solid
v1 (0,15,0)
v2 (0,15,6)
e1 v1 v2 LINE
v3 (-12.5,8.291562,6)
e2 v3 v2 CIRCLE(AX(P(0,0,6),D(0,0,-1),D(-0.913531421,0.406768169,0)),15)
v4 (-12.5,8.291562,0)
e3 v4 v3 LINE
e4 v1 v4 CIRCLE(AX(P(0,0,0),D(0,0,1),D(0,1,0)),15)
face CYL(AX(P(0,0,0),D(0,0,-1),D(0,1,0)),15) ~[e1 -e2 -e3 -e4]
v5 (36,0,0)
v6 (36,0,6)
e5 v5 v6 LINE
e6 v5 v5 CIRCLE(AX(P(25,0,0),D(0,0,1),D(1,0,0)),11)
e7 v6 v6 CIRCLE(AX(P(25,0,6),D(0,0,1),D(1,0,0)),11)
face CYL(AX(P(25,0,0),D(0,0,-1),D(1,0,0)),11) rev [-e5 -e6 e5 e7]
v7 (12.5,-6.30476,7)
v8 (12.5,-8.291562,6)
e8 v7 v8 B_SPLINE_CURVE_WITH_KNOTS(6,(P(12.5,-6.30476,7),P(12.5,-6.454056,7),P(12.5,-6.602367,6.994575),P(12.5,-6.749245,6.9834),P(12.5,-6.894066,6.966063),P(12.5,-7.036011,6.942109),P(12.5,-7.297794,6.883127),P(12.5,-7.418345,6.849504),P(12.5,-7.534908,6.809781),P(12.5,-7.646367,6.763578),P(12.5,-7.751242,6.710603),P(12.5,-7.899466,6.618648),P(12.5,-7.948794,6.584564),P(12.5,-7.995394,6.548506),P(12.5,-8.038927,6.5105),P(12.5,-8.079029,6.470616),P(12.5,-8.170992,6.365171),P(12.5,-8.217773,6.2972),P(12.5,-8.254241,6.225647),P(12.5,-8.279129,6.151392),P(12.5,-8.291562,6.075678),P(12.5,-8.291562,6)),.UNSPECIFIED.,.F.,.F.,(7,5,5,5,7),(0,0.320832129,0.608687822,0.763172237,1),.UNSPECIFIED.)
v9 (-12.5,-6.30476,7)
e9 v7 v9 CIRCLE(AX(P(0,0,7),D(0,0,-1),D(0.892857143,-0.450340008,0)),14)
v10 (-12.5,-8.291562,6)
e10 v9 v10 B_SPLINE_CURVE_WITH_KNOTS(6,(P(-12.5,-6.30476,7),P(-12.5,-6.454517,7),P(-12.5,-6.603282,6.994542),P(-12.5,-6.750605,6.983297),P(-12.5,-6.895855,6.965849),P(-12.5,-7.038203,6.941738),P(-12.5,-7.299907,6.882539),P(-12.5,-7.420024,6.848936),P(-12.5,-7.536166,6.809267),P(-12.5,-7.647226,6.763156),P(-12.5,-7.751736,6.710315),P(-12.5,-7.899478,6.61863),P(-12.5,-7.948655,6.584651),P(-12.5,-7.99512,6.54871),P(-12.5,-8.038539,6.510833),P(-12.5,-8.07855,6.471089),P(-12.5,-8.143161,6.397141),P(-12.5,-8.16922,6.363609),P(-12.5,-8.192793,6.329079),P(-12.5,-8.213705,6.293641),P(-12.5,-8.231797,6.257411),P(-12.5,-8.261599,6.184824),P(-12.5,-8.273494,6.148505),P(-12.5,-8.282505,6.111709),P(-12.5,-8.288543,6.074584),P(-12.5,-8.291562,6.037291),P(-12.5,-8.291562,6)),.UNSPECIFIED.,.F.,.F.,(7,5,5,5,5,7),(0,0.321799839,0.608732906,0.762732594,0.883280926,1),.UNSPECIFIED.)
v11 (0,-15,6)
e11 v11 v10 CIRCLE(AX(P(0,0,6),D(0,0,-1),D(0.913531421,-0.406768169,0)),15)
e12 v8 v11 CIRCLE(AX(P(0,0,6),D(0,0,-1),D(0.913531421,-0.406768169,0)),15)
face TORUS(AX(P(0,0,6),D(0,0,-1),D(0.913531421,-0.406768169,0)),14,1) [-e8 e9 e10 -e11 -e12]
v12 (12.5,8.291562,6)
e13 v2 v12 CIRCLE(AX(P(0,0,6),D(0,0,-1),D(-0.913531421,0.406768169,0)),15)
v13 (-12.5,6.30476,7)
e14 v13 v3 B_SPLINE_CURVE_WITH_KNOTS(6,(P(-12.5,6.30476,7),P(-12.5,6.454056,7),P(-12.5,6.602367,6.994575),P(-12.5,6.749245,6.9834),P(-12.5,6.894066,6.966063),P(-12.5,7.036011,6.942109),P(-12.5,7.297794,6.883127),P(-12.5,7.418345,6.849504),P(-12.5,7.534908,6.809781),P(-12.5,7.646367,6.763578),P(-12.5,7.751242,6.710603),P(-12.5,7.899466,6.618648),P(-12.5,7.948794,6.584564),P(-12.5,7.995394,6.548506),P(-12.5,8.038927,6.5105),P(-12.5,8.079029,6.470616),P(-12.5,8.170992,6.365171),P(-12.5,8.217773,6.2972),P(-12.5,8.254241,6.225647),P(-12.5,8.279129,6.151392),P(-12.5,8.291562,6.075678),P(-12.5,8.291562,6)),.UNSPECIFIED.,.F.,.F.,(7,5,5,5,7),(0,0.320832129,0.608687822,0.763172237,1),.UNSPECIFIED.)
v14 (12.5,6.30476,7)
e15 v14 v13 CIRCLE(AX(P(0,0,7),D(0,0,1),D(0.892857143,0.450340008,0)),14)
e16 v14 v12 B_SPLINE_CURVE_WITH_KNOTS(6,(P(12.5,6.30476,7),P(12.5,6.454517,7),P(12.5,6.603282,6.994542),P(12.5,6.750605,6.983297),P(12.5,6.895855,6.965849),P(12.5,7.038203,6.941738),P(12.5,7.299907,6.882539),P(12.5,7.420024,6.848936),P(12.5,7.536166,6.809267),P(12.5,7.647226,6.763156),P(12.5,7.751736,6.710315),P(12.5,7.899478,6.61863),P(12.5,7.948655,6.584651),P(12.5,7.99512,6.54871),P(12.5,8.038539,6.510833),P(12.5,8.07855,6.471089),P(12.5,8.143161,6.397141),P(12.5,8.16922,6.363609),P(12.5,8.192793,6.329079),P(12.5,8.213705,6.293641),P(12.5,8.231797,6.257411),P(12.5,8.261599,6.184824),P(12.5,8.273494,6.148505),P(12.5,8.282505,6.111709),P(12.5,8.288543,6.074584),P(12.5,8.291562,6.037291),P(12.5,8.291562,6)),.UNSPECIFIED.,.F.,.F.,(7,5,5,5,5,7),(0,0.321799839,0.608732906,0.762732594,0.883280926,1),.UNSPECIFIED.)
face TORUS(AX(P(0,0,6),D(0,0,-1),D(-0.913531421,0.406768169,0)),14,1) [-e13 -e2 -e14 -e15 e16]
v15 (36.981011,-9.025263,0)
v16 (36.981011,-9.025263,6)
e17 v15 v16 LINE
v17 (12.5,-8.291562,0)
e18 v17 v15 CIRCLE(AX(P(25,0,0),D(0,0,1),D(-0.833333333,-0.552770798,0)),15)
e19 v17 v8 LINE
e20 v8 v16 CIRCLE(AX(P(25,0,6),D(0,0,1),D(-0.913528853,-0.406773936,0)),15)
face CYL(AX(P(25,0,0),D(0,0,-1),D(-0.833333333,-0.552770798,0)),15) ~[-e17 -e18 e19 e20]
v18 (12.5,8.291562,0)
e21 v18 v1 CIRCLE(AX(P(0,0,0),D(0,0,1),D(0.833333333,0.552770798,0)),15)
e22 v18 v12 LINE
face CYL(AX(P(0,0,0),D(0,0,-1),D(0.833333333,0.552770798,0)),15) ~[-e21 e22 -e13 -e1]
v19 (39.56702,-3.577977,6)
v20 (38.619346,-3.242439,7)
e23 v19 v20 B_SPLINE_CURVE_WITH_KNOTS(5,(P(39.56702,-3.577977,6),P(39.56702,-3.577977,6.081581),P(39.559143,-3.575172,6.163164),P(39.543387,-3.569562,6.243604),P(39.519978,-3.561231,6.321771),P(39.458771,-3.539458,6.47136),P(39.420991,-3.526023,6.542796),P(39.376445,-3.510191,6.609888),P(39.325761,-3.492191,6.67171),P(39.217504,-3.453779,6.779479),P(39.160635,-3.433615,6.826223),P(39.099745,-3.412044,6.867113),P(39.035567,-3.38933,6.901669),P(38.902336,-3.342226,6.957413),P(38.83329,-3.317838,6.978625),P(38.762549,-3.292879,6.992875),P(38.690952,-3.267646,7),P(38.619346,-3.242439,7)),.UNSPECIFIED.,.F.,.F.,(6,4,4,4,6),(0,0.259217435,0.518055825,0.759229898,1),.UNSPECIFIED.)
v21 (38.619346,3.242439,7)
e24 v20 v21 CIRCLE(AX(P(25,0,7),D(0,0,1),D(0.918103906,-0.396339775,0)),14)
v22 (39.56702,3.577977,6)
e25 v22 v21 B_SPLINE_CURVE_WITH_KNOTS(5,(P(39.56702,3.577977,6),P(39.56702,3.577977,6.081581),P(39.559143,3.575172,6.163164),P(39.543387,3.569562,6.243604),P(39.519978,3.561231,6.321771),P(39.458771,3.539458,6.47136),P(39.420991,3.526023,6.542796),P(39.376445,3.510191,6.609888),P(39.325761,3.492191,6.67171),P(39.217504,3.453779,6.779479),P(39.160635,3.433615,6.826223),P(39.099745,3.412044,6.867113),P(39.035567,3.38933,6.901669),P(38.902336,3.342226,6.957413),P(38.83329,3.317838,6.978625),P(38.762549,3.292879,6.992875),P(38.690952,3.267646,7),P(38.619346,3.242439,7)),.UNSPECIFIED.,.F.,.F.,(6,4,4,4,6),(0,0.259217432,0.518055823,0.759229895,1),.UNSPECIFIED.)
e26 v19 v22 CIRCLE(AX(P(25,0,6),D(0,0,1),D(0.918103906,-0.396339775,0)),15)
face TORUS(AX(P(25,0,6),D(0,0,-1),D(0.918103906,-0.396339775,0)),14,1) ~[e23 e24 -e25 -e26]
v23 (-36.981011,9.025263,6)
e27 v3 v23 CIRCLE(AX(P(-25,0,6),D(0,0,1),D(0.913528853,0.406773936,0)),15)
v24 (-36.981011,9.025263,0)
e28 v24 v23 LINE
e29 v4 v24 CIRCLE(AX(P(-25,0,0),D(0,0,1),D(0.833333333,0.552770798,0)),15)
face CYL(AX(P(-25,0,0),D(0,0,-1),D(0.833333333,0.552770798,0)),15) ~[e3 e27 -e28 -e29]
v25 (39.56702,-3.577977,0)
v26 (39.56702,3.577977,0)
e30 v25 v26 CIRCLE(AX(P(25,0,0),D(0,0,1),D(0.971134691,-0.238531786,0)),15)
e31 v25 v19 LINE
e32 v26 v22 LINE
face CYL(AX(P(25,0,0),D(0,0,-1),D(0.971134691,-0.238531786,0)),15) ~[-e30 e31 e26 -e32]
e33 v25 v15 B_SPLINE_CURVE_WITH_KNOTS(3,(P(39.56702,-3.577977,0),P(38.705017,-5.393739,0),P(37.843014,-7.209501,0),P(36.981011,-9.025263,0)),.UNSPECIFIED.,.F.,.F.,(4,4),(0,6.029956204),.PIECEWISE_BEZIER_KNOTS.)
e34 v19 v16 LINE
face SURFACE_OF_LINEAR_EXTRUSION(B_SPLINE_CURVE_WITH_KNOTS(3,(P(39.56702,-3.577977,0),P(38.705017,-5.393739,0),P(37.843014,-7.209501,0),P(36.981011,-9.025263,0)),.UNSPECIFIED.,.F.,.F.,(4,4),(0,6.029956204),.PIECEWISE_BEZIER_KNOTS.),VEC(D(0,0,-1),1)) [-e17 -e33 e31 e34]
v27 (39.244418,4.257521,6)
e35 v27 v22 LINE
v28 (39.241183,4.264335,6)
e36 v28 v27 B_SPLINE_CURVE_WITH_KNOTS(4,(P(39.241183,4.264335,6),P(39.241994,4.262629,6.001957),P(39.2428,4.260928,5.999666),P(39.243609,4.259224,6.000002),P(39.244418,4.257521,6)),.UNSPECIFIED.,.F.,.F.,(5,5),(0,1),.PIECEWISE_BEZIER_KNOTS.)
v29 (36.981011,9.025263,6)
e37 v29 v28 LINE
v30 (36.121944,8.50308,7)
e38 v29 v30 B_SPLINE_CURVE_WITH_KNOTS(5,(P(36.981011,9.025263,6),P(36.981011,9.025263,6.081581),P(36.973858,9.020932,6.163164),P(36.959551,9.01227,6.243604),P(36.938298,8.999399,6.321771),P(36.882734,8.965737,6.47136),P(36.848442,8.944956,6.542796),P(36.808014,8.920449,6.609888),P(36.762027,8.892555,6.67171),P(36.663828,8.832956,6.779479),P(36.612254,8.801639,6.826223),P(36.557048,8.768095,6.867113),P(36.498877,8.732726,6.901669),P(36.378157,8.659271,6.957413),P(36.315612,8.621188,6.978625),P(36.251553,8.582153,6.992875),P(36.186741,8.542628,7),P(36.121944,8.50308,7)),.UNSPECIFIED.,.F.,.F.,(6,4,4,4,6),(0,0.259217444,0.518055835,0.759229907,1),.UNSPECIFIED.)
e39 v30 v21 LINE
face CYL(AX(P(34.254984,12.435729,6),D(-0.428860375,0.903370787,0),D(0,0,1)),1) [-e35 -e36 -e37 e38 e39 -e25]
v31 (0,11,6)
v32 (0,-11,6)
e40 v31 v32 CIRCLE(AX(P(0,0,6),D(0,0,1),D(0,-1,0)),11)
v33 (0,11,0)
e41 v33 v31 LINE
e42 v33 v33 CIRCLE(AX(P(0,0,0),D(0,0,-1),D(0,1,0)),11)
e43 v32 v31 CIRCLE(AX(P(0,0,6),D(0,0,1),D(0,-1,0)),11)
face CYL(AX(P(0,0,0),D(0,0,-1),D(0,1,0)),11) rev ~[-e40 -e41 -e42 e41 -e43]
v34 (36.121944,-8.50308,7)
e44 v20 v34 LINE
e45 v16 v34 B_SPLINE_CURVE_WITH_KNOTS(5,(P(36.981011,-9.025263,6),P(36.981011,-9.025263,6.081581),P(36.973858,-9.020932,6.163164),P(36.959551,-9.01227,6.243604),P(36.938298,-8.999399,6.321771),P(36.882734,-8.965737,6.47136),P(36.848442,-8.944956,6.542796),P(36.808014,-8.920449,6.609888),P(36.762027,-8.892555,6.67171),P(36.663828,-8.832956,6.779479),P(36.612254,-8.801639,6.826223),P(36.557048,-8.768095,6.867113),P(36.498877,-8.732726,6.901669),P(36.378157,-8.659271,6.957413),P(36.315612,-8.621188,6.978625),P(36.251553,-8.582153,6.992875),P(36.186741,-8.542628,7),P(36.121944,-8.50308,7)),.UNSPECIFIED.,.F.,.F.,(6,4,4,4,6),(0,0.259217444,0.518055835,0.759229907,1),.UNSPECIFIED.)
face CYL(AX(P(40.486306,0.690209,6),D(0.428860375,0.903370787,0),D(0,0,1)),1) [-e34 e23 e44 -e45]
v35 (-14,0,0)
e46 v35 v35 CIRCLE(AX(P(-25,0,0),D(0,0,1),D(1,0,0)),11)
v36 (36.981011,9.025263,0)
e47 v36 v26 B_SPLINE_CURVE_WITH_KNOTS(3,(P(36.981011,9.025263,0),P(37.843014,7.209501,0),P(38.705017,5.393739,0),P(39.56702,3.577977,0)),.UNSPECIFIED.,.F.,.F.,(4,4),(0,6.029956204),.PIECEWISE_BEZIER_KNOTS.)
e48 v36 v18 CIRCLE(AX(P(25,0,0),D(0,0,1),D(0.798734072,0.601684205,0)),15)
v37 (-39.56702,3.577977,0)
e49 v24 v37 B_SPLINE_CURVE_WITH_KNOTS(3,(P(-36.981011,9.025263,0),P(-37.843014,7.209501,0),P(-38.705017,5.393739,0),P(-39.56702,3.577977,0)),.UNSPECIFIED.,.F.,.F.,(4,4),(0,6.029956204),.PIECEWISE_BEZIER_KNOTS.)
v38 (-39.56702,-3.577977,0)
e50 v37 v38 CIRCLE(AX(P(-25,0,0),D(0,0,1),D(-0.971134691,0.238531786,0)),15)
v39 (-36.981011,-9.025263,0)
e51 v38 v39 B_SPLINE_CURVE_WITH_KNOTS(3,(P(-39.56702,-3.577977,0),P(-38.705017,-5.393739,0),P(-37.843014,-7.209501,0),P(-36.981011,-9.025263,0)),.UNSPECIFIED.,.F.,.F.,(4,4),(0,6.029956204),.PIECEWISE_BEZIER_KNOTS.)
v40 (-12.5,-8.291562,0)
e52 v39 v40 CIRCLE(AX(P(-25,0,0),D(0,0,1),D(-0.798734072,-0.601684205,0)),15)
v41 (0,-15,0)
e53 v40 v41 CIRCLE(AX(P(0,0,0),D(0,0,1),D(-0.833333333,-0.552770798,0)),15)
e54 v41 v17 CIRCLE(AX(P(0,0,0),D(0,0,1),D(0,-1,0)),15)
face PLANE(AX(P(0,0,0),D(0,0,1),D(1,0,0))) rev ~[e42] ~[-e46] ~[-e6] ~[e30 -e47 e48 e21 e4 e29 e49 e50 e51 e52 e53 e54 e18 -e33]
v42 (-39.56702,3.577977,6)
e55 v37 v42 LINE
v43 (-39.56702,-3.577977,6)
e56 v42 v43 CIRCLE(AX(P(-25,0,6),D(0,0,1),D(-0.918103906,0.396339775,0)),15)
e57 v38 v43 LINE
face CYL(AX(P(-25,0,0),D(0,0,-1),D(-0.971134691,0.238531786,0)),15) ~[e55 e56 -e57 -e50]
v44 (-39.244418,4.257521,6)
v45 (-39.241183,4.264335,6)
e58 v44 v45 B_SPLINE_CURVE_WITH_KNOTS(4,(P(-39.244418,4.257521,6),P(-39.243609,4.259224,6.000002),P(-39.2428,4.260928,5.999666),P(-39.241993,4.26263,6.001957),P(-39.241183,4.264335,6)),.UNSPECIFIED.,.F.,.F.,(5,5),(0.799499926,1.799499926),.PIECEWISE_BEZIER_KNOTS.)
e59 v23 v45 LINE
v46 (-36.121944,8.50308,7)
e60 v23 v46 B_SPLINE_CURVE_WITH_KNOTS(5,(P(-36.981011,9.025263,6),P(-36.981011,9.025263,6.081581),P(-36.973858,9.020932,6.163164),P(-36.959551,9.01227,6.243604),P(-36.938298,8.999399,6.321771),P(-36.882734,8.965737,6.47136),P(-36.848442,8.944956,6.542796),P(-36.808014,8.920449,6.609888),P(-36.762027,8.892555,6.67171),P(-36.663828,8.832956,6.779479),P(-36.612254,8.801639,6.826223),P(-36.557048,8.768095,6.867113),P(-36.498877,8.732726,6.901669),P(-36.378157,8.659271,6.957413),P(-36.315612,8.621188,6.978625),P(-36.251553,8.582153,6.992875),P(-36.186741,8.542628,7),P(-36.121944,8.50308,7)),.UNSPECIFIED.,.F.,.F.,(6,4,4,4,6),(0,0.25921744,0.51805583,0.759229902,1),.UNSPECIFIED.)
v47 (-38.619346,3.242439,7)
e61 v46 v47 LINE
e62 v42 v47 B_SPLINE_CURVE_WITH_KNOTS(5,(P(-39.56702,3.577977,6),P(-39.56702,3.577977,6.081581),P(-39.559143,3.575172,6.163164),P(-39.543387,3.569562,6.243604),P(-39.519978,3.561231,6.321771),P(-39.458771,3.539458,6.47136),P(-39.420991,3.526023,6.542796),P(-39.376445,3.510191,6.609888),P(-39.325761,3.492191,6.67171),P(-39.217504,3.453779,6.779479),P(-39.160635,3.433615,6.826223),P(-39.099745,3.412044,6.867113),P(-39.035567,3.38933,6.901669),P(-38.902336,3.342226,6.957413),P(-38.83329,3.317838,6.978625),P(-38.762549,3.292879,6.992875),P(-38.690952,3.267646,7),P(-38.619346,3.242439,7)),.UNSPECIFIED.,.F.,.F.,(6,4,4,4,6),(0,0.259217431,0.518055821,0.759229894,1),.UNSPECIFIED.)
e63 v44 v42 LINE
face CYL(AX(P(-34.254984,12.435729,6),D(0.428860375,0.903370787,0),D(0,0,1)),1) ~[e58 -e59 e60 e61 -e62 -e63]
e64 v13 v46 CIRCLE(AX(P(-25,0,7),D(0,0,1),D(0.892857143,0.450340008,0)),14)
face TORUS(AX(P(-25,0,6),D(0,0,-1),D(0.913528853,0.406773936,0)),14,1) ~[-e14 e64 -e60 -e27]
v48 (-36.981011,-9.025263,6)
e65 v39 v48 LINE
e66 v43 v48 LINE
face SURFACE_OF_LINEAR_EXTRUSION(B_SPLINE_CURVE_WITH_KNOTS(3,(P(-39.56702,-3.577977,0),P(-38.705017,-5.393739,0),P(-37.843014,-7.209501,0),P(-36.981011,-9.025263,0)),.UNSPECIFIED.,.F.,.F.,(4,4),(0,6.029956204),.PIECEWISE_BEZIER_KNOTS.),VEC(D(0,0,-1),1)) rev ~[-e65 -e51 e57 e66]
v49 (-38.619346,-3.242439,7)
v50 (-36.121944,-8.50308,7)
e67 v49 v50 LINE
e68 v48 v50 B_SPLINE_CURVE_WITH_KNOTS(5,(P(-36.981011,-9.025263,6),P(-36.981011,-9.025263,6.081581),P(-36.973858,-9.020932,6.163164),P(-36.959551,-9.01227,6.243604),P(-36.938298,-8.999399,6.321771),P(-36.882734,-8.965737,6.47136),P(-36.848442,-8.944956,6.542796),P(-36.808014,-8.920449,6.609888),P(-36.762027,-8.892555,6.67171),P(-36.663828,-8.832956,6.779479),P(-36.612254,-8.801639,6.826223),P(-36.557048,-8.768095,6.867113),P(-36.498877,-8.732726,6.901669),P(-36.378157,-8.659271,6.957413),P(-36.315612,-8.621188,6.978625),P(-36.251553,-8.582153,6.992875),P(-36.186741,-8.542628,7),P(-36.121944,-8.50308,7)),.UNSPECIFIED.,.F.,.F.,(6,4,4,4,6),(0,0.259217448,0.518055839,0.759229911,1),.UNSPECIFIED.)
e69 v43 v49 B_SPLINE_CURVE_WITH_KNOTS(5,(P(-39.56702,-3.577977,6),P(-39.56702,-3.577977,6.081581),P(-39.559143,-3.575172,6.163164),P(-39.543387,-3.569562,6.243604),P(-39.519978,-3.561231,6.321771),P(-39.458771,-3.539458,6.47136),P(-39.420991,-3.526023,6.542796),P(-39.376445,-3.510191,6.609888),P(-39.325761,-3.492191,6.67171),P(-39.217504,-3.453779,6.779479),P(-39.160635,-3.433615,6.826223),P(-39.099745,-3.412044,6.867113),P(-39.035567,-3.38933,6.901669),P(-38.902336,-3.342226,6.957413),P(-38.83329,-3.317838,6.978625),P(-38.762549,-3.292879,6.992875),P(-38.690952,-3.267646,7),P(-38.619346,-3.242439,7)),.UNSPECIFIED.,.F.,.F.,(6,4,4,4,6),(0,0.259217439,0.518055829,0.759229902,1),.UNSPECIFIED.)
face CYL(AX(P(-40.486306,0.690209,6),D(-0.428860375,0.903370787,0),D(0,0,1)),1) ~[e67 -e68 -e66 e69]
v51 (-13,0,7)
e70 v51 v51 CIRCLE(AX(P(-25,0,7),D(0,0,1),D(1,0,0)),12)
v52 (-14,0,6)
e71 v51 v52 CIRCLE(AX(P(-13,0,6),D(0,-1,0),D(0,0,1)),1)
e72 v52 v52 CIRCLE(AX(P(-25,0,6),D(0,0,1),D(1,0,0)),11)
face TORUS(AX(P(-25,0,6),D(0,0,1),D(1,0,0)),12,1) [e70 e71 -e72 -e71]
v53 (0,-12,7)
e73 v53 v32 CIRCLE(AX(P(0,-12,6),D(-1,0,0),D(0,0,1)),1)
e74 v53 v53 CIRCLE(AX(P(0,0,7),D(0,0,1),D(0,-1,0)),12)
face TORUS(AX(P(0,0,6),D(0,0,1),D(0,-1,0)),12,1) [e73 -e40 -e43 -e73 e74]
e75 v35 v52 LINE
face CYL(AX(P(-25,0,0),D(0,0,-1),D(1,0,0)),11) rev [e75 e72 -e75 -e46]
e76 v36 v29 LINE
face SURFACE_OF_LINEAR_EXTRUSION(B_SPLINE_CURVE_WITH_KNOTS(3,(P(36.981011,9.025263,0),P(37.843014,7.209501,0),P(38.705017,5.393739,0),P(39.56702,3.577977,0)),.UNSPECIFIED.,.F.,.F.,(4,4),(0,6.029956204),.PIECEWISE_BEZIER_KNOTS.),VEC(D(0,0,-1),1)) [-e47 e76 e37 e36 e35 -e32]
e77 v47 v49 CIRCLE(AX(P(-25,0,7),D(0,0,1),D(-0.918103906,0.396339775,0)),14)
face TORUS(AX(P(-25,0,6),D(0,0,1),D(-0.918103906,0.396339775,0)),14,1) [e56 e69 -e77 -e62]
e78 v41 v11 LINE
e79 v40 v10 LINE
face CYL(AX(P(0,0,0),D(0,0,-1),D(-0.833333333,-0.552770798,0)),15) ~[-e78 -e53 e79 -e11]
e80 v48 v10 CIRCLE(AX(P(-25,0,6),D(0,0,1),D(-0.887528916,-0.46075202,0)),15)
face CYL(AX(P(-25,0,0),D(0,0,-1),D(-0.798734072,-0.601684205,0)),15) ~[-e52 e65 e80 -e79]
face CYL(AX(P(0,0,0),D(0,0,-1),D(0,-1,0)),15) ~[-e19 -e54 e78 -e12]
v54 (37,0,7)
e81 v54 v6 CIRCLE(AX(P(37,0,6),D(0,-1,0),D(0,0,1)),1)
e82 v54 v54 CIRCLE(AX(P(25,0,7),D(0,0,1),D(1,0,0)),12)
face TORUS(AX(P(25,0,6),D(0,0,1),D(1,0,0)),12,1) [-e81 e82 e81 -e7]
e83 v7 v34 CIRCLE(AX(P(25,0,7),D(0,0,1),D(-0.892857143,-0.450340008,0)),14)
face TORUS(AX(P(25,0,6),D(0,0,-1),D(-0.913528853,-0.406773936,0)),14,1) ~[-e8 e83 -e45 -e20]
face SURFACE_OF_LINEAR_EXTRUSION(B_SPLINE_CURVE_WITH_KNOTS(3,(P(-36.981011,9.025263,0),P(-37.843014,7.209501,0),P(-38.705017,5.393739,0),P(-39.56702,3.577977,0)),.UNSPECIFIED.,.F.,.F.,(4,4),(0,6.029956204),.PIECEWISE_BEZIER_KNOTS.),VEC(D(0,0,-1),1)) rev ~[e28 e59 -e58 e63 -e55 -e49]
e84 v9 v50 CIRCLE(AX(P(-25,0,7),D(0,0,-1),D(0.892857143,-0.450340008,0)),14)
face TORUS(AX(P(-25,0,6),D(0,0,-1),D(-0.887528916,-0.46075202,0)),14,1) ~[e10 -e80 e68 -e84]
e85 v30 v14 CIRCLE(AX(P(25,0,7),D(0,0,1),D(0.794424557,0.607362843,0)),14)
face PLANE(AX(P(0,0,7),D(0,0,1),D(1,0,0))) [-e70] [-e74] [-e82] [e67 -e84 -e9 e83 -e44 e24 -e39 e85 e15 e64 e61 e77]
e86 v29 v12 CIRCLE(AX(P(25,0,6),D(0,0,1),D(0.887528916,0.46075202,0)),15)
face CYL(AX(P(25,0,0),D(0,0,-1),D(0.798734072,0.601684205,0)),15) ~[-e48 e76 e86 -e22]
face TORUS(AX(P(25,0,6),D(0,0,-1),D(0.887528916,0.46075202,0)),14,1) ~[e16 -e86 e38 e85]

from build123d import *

# Parameters (mm, degrees)
F0_R          = 11
F1_DEPTH      = 7
F2_T1_DEPTH   = 14.5299562036
F2_T3_DEPTH   = 14.5299562036
F2_T5_DEPTH   = 14.5299562036
F2_T7_DEPTH   = 14.5299562036
F2_T12_ANGLE  = 46.6991172175
F2_T16_ANGLE  = 128.5620164001
F2_S17_R      = 15
F2_T18_DEPTH  = 17
F2_T22_ANGLE  = 131.9960454578
F2_S23_R      = 15
F2_T24_DEPTH  = 17
F2_S25_R      = 15
F2_T26_DEPTH  = 17
F2_T30_ANGLE  = 128.5620164001
F2_S31_R      = 15
F2_T32_DEPTH  = 17
F2_T34_ANGLE  = 46.6991172175
F2_T38_ANGLE  = 128.5620164001
F2_S39_R      = 15
F2_T40_DEPTH  = 17
F2_T44_ANGLE  = 131.9960454578
F2_S45_R      = 15
F2_T46_DEPTH  = 17
F2_S47_R      = 15
F2_T48_DEPTH  = 17
F2_T52_ANGLE  = 128.5620164001
F2_S53_R      = 15
F2_T54_DEPTH  = 17
F2_T63_ANGLE  = 128.5620164001
F2_S64_R      = 15
F2_T65_DEPTH  = 17
F2_T68_ANGLE  = 131.9960454578
F2_S69_R      = 15
F2_T70_DEPTH  = 17
F2_T76_ANGLE  = 131.9960454578
F2_S77_R      = 15
F2_T78_DEPTH  = 17
F2_T81_ANGLE  = 128.5620164001
F2_S82_R      = 15
F2_T83_DEPTH  = 17
F2_T89_ANGLE  = 128.5620164001
F2_S90_R      = 15
F2_T91_DEPTH  = 17
F2_T94_ANGLE  = 131.9960454578
F2_S95_R      = 15
F2_T96_DEPTH  = 17
F2_T102_ANGLE = 131.9960454578
F2_S103_R     = 15
F2_T104_DEPTH = 17
F2_T107_ANGLE = 128.5620164001
F2_S108_R     = 15
F2_T109_DEPTH = 17


# Not quite as in the source:
# - a fillet or chamfer that OpenCascade refuses, or shapes differently, is made with other operations: its cross-section is extruded or revolved along the edge and cut away or added


with BuildPart() as f1:
    # F0 (on Top) → F1 (new body)
    with BuildSketch(Plane.XY):
        with BuildLine():
            ThreePointArc((-36.9810110821, -9.0252630682), (-24.5506485813, -14.9932679327), (-12.5, -8.2915619759))
            ThreePointArc((-12.5, -8.2915619759), (-7.0931858273, -13.2169101843), (0, -15))
            ThreePointArc((0, -15), (7.0931858273, -13.2169101843), (12.5, -8.2915619759))
            ThreePointArc((12.5, -8.2915619759), (24.5506485813, -14.9932679327), (36.9810110821, -9.0252630682))
            add(Edge.make_bspline(
                [(39.5670203583, -3.577976786), (38.7050172662, -5.39373888), (37.8430141742, -7.2095009741), (36.9810110821, -9.0252630682)],
                knots=[0, 0, 0, 0, 6.0299562036, 6.0299562036, 6.0299562036, 6.0299562036], degree=3))
            ThreePointArc((39.5670203583, -3.577976786), (40, 0), (39.5670203583, 3.577976786))
            add(Edge.make_bspline(
                [(36.9810110821, 9.0252630682), (37.8430141742, 7.2095009741), (38.7050172662, 5.39373888), (39.5670203583, 3.577976786)],
                knots=[0, 0, 0, 0, 6.0299562036, 6.0299562036, 6.0299562036, 6.0299562036], degree=3))
            ThreePointArc((36.9810110821, 9.0252630682), (24.5506485813, 14.9932679327), (12.5, 8.2915619759))
            ThreePointArc((12.5, 8.2915619759), (7.0931858273, 13.2169101843), (0, 15))
            ThreePointArc((0, 15), (-7.0931858273, 13.2169101843), (-12.5, 8.2915619759))
            ThreePointArc((-12.5, 8.2915619759), (-24.5506485813, 14.9932679327), (-36.9810110821, 9.0252630682))
            add(Edge.make_bspline(
                [(-36.9810110821, 9.0252630682), (-37.8430141742, 7.2095009741), (-38.7050172662, 5.39373888), (-39.5670203583, 3.577976786)],
                knots=[0, 0, 0, 0, 6.0299562036, 6.0299562036, 6.0299562036, 6.0299562036], degree=3))
            ThreePointArc((-39.5670203583, 3.577976786), (-40, 0), (-39.5670203583, -3.577976786))
            add(Edge.make_bspline(
                [(-39.5670203583, -3.577976786), (-38.7050172662, -5.39373888), (-37.8430141742, -7.2095009741), (-36.9810110821, -9.0252630682)],
                knots=[0, 0, 0, 0, 6.0299562036, 6.0299562036, 6.0299562036, 6.0299562036], degree=3))
        make_face()
        with Locations((-25, 0)):
            Circle(F0_R, mode=Mode.SUBTRACT)
        with BuildLine():
            ThreePointArc((0, -11), (-11, 0), (0, 11))
            ThreePointArc((0, 11), (11, 0), (0, -11))
        make_face(mode=Mode.SUBTRACT)
        with Locations((25, 0)):
            Circle(F0_R, mode=Mode.SUBTRACT)
    extrude(amount=F1_DEPTH)

    # F2: fillet of radius 1 on 15 edges, made by hand

    # F2_s2 → F2_t1 (cut)
    with BuildSketch(Plane(origin=(-7.7136917523, 16.2484673409, 0), x_dir=(0, 0, 1), z_dir=(0.4288603746, -0.9033707872, 0))):
        with BuildLine():
            ThreePointArc((7, 36.2781427917), (6.7071067812, 36.9852495729), (6, 37.2781427917))
            Line((6, 37.2781427917), (7, 37.2781427917))
            Line((7, 37.2781427917), (7, 36.2781427917))
        make_face()
    extrude(amount=F2_T1_DEPTH, mode=Mode.SUBTRACT)

    # F2_s4 → F2_t3 (cut)
    with BuildSketch(Plane(origin=(7.7136917523, 16.2484673409, 0), x_dir=(0, 0, 1), z_dir=(-0.4288603746, -0.9033707872, 0))):
        with BuildLine():
            ThreePointArc((7, -36.2781427917), (6.7071067812, -36.9852495729), (6, -37.2781427917))
            Line((6, -37.2781427917), (7, -37.2781427917))
            Line((7, -37.2781427917), (7, -36.2781427917))
        make_face()
    extrude(amount=F2_T3_DEPTH, mode=Mode.SUBTRACT)

    # F2_s6 → F2_t5 (cut)
    with BuildSketch(Plane(origin=(1.4823692921, -3.1225293677, 0), x_dir=(0, 0, 1), z_dir=(0.4288603746, -0.9033707872, 0))):
        with BuildLine():
            ThreePointArc((7, -36.2781427917), (6.7071067812, -36.9852495729), (6, -37.2781427917))
            Line((6, -37.2781427917), (7, -37.2781427917))
            Line((7, -37.2781427917), (7, -36.2781427917))
        make_face()
    extrude(amount=F2_T5_DEPTH, mode=Mode.SUBTRACT)

    # F2_s8 → F2_t7 (cut)
    with BuildSketch(Plane(origin=(-1.4823692921, -3.1225293677, 0), x_dir=(0, 0, 1), z_dir=(-0.4288603746, -0.9033707872, 0))):
        with BuildLine():
            ThreePointArc((7, 36.2781427917), (6.7071067812, 36.9852495729), (6, 37.2781427917))
            Line((6, 37.2781427917), (7, 37.2781427917))
            Line((7, 37.2781427917), (7, 36.2781427917))
        make_face()
    extrude(amount=F2_T7_DEPTH, mode=Mode.SUBTRACT)

    # F2_s9 → F2_t10 (revolve, cut)
    with BuildSketch(Plane.XZ):
        with BuildLine():
            ThreePointArc((-13, 7), (-13.7071067812, 6.7071067812), (-14, 6))
            Line((-14, 6), (-14, 7))
            Line((-14, 7), (-13, 7))
        make_face()
    revolve(axis=Axis((-25, 0, 7), (0, 0, 1)), mode=Mode.SUBTRACT)

    # F2_s11 → F2_t12 (revolve, cut)
    with BuildSketch(Plane(origin=(-3.9271304253, -9.0970273856, 0), x_dir=(0, 0, 1), z_dir=(0.3963397747, 0.9181039064, 0))):
        with BuildLine():
            ThreePointArc((6, -37.9525976606), (6.7071067812, -37.6597044417), (7, -36.9525976606))
            Line((7, -36.9525976606), (7, -37.9525976606))
            Line((7, -37.9525976606), (6, -37.9525976606))
        make_face()
    revolve(axis=Axis((-25, 0, 7), (0, 0, 1)), revolution_arc=F2_T12_ANGLE, mode=Mode.SUBTRACT)


with BuildPart() as f2_tool14:
    # F2_s15 → F2_t16 (revolve)
    with BuildSketch(Plane(origin=(-5.3073105904, 10.2232685114, 0), x_dir=(0, 0, 1), z_dir=(-0.4607520197, 0.8875289158, 0))):
        with BuildLine():
            ThreePointArc((7, -36.188222895), (6.7071067812, -36.8953296762), (6, -37.188222895))
            Line((6, -37.188222895), (7, -37.188222895))
            Line((7, -37.188222895), (7, -36.188222895))
        make_face()
    revolve(axis=Axis((-25, 0, 7), (0, 0, 1)), revolution_arc=F2_T16_ANGLE)

    # F2_s17 → F2_t18 (cut, symmetric)
    with BuildSketch(Plane.XY.offset(6.1)):
        Circle(F2_S17_R)
    extrude(amount=F2_T18_DEPTH, both=True, mode=Mode.SUBTRACT)


with BuildPart() as f1_1:
    add(f1.part)

    # F2_t13: cut F2_tool14
    add(f2_tool14.part, mode=Mode.SUBTRACT)


with BuildPart() as f2_tool20:
    # F2_s21 → F2_t22 (revolve)
    with BuildSketch(Plane(origin=(0, 0, 0), x_dir=(0, 0, 1), z_dir=(0.4067681692, 0.9135314207, 0))):
        with BuildLine():
            ThreePointArc((7, 14), (6.7071067812, 14.7071067812), (6, 15))
            Line((6, 15), (7, 15))
            Line((7, 15), (7, 14))
        make_face()
    revolve(axis=Axis((0, 0, 7), (0, 0, -1)), revolution_arc=F2_T22_ANGLE)

    # F2_s23 → F2_t24 (cut, symmetric)
    with BuildSketch(Plane.XY.offset(6.1)):
        with Locations((25, 0)):
            Circle(F2_S23_R)
    extrude(amount=F2_T24_DEPTH, both=True, mode=Mode.SUBTRACT)

    # F2_s25 → F2_t26 (cut, symmetric)
    with BuildSketch(Plane.XY.offset(6.1)):
        with Locations((-25, 0)):
            Circle(F2_S25_R)
    extrude(amount=F2_T26_DEPTH, both=True, mode=Mode.SUBTRACT)


with BuildPart() as f1_2:
    add(f1_1.part)

    # F2_t19: cut F2_tool20
    add(f2_tool20.part, mode=Mode.SUBTRACT)


with BuildPart() as f2_tool28:
    # F2_s29 → F2_t30 (revolve)
    with BuildSketch(Plane(origin=(4.1366258853, -9.2899931871, 0), x_dir=(0, 0, 1), z_dir=(-0.4067739365, 0.9135288526, 0))):
        with BuildLine():
            ThreePointArc((7, 8.8382213158), (6.7071067812, 8.1311145346), (6, 7.8382213158))
            Line((6, 7.8382213158), (7, 7.8382213158))
            Line((7, 7.8382213158), (7, 8.8382213158))
        make_face()
    revolve(axis=Axis((25, 0, 7), (0, 0, 1)), revolution_arc=F2_T30_ANGLE)

    # F2_s31 → F2_t32 (cut, symmetric)
    with BuildSketch(Plane.XY.offset(6.1)):
        Circle(F2_S31_R)
    extrude(amount=F2_T32_DEPTH, both=True, mode=Mode.SUBTRACT)


with BuildPart() as f1_3:
    add(f1_2.part)

    # F2_t27: cut F2_tool28
    add(f2_tool28.part, mode=Mode.SUBTRACT)

    # F2_s33 → F2_t34 (revolve, cut)
    with BuildSketch(Plane(origin=(3.9271304253, 9.0970273856, 0), x_dir=(0, 0, 1), z_dir=(-0.3963397747, -0.9181039064, 0))):
        with BuildLine():
            ThreePointArc((7, -36.9525976606), (6.7071067812, -37.6597044417), (6, -37.9525976606))
            Line((6, -37.9525976606), (7, -37.9525976606))
            Line((7, -37.9525976606), (7, -36.9525976606))
        make_face()
    revolve(axis=Axis((25, 0, 7), (0, 0, 1)), revolution_arc=F2_T34_ANGLE, mode=Mode.SUBTRACT)


with BuildPart() as f2_tool36:
    # F2_s37 → F2_t38 (revolve)
    with BuildSketch(Plane(origin=(5.3073105904, -10.2232685114, 0), x_dir=(0, 0, 1), z_dir=(0.4607520197, -0.8875289158, 0))):
        with BuildLine():
            ThreePointArc((7, -36.188222895), (6.7071067812, -36.8953296762), (6, -37.188222895))
            Line((6, -37.188222895), (7, -37.188222895))
            Line((7, -37.188222895), (7, -36.188222895))
        make_face()
    revolve(axis=Axis((25, 0, 7), (0, 0, 1)), revolution_arc=F2_T38_ANGLE)

    # F2_s39 → F2_t40 (cut, symmetric)
    with BuildSketch(Plane.XY.offset(6.1)):
        Circle(F2_S39_R)
    extrude(amount=F2_T40_DEPTH, both=True, mode=Mode.SUBTRACT)


with BuildPart() as f1_4:
    add(f1_3.part)

    # F2_t35: cut F2_tool36
    add(f2_tool36.part, mode=Mode.SUBTRACT)


with BuildPart() as f2_tool42:
    # F2_s43 → F2_t44 (revolve)
    with BuildSketch(Plane(origin=(0, 0, 0), x_dir=(0, 0, 1), z_dir=(-0.4067681692, -0.9135314207, 0))):
        with BuildLine():
            ThreePointArc((7, 14), (6.7071067812, 14.7071067812), (6, 15))
            Line((6, 15), (7, 15))
            Line((7, 15), (7, 14))
        make_face()
    revolve(axis=Axis((0, 0, 7), (0, 0, -1)), revolution_arc=F2_T44_ANGLE)

    # F2_s45 → F2_t46 (cut, symmetric)
    with BuildSketch(Plane.XY.offset(6.1)):
        with Locations((-25, 0)):
            Circle(F2_S45_R)
    extrude(amount=F2_T46_DEPTH, both=True, mode=Mode.SUBTRACT)

    # F2_s47 → F2_t48 (cut, symmetric)
    with BuildSketch(Plane.XY.offset(6.1)):
        with Locations((25, 0)):
            Circle(F2_S47_R)
    extrude(amount=F2_T48_DEPTH, both=True, mode=Mode.SUBTRACT)


with BuildPart() as f1_5:
    add(f1_4.part)

    # F2_t41: cut F2_tool42
    add(f2_tool42.part, mode=Mode.SUBTRACT)


with BuildPart() as f2_tool50:
    # F2_s51 → F2_t52 (revolve)
    with BuildSketch(Plane(origin=(-4.1366258853, 9.2899931871, 0), x_dir=(0, 0, 1), z_dir=(0.4067739365, -0.9135288526, 0))):
        with BuildLine():
            ThreePointArc((7, 8.8382213158), (6.7071067812, 8.1311145346), (6, 7.8382213158))
            Line((6, 7.8382213158), (7, 7.8382213158))
            Line((7, 7.8382213158), (7, 8.8382213158))
        make_face()
    revolve(axis=Axis((-25, 0, 7), (0, 0, 1)), revolution_arc=F2_T52_ANGLE)

    # F2_s53 → F2_t54 (cut, symmetric)
    with BuildSketch(Plane.XY.offset(6.1)):
        Circle(F2_S53_R)
    extrude(amount=F2_T54_DEPTH, both=True, mode=Mode.SUBTRACT)


with BuildPart() as f1_6:
    add(f1_5.part)

    # F2_t49: cut F2_tool50
    add(f2_tool50.part, mode=Mode.SUBTRACT)

    # F2_s55 → F2_t56 (revolve, cut)
    with BuildSketch(Plane.YZ):
        with BuildLine():
            ThreePointArc((-12, 7), (-11.2928932188, 6.7071067812), (-11, 6))
            Line((-11, 6), (-11, 7))
            Line((-11, 7), (-12, 7))
        make_face()
    revolve(axis=Axis((0, 0, 7), (0, 0, 1)), mode=Mode.SUBTRACT)

    # F2_s57 → F2_t58 (revolve, cut)
    with BuildSketch(Plane.XZ):
        with BuildLine():
            ThreePointArc((37, 7), (36.2928932188, 6.7071067812), (36, 6))
            Line((36, 6), (36, 7))
            Line((36, 7), (37, 7))
        make_face()
    revolve(axis=Axis((25, 0, 7), (0, 0, 1)), mode=Mode.SUBTRACT)


with BuildPart() as f2_tool61:
    # F2_s62 → F2_t63 (revolve)
    with BuildSketch(Plane(origin=(-5.3073105904, 10.2232685114, 0), x_dir=(0, 0, 1), z_dir=(-0.4607520197, 0.8875289158, 0))):
        with BuildLine():
            ThreePointArc((7, -36.188222895), (6.7071067812, -36.8953296762), (6, -37.188222895))
            Line((6, -37.188222895), (7, -37.188222895))
            Line((7, -37.188222895), (7, -36.188222895))
        make_face()
    revolve(axis=Axis((-25, 0, 7), (0, 0, 1)), revolution_arc=F2_T63_ANGLE)

    # F2_s64 → F2_t65 (intersect, symmetric)
    with BuildSketch(Plane.XY.offset(6.1)):
        Circle(F2_S64_R)
    extrude(amount=F2_T65_DEPTH, both=True, mode=Mode.INTERSECT)


with BuildPart() as f2_tool66:
    # F2_s67 → F2_t68 (revolve)
    with BuildSketch(Plane(origin=(0, 0, 0), x_dir=(0, 0, 1), z_dir=(0.4067681692, 0.9135314207, 0))):
        with BuildLine():
            ThreePointArc((7, 14), (6.7071067812, 14.7071067812), (6, 15))
            Line((6, 15), (7, 15))
            Line((7, 15), (7, 14))
        make_face()
    revolve(axis=Axis((0, 0, 7), (0, 0, -1)), revolution_arc=F2_T68_ANGLE)

    # F2_s69 → F2_t70 (intersect, symmetric)
    with BuildSketch(Plane.XY.offset(6.1)):
        with Locations((-25, 0)):
            Circle(F2_S69_R)
    extrude(amount=F2_T70_DEPTH, both=True, mode=Mode.INTERSECT)


with BuildPart() as f2_tool61_1:
    add(f2_tool61.part)

    # F2_t71: intersect F2_tool66
    add(f2_tool66.part, mode=Mode.INTERSECT)


with BuildPart() as f1_7:
    add(f1_6.part)

    # F2_t59: cut F2_tool61
    add(f2_tool61_1.part, mode=Mode.SUBTRACT)


with BuildPart() as f2_tool74:
    # F2_s75 → F2_t76 (revolve)
    with BuildSketch(Plane(origin=(0, 0, 0), x_dir=(0, 0, 1), z_dir=(0.4067681692, 0.9135314207, 0))):
        with BuildLine():
            ThreePointArc((7, 14), (6.7071067812, 14.7071067812), (6, 15))
            Line((6, 15), (7, 15))
            Line((7, 15), (7, 14))
        make_face()
    revolve(axis=Axis((0, 0, 7), (0, 0, -1)), revolution_arc=F2_T76_ANGLE)

    # F2_s77 → F2_t78 (intersect, symmetric)
    with BuildSketch(Plane.XY.offset(6.1)):
        with Locations((25, 0)):
            Circle(F2_S77_R)
    extrude(amount=F2_T78_DEPTH, both=True, mode=Mode.INTERSECT)


with BuildPart() as f2_tool79:
    # F2_s80 → F2_t81 (revolve)
    with BuildSketch(Plane(origin=(4.1366258853, -9.2899931871, 0), x_dir=(0, 0, 1), z_dir=(-0.4067739365, 0.9135288526, 0))):
        with BuildLine():
            ThreePointArc((7, 8.8382213158), (6.7071067812, 8.1311145346), (6, 7.8382213158))
            Line((6, 7.8382213158), (7, 7.8382213158))
            Line((7, 7.8382213158), (7, 8.8382213158))
        make_face()
    revolve(axis=Axis((25, 0, 7), (0, 0, 1)), revolution_arc=F2_T81_ANGLE)

    # F2_s82 → F2_t83 (intersect, symmetric)
    with BuildSketch(Plane.XY.offset(6.1)):
        Circle(F2_S82_R)
    extrude(amount=F2_T83_DEPTH, both=True, mode=Mode.INTERSECT)


with BuildPart() as f2_tool74_1:
    add(f2_tool74.part)

    # F2_t84: intersect F2_tool79
    add(f2_tool79.part, mode=Mode.INTERSECT)


with BuildPart() as f1_8:
    add(f1_7.part)

    # F2_t72: cut F2_tool74
    add(f2_tool74_1.part, mode=Mode.SUBTRACT)


with BuildPart() as f2_tool87:
    # F2_s88 → F2_t89 (revolve)
    with BuildSketch(Plane(origin=(5.3073105904, -10.2232685114, 0), x_dir=(0, 0, 1), z_dir=(0.4607520197, -0.8875289158, 0))):
        with BuildLine():
            ThreePointArc((7, -36.188222895), (6.7071067812, -36.8953296762), (6, -37.188222895))
            Line((6, -37.188222895), (7, -37.188222895))
            Line((7, -37.188222895), (7, -36.188222895))
        make_face()
    revolve(axis=Axis((25, 0, 7), (0, 0, 1)), revolution_arc=F2_T89_ANGLE)

    # F2_s90 → F2_t91 (intersect, symmetric)
    with BuildSketch(Plane.XY.offset(6.1)):
        Circle(F2_S90_R)
    extrude(amount=F2_T91_DEPTH, both=True, mode=Mode.INTERSECT)


with BuildPart() as f2_tool92:
    # F2_s93 → F2_t94 (revolve)
    with BuildSketch(Plane(origin=(0, 0, 0), x_dir=(0, 0, 1), z_dir=(-0.4067681692, -0.9135314207, 0))):
        with BuildLine():
            ThreePointArc((7, 14), (6.7071067812, 14.7071067812), (6, 15))
            Line((6, 15), (7, 15))
            Line((7, 15), (7, 14))
        make_face()
    revolve(axis=Axis((0, 0, 7), (0, 0, -1)), revolution_arc=F2_T94_ANGLE)

    # F2_s95 → F2_t96 (intersect, symmetric)
    with BuildSketch(Plane.XY.offset(6.1)):
        with Locations((25, 0)):
            Circle(F2_S95_R)
    extrude(amount=F2_T96_DEPTH, both=True, mode=Mode.INTERSECT)


with BuildPart() as f2_tool87_1:
    add(f2_tool87.part)

    # F2_t97: intersect F2_tool92
    add(f2_tool92.part, mode=Mode.INTERSECT)


with BuildPart() as f1_9:
    add(f1_8.part)

    # F2_t85: cut F2_tool87
    add(f2_tool87_1.part, mode=Mode.SUBTRACT)


with BuildPart() as f2_tool100:
    # F2_s101 → F2_t102 (revolve)
    with BuildSketch(Plane(origin=(0, 0, 0), x_dir=(0, 0, 1), z_dir=(-0.4067681692, -0.9135314207, 0))):
        with BuildLine():
            ThreePointArc((7, 14), (6.7071067812, 14.7071067812), (6, 15))
            Line((6, 15), (7, 15))
            Line((7, 15), (7, 14))
        make_face()
    revolve(axis=Axis((0, 0, 7), (0, 0, -1)), revolution_arc=F2_T102_ANGLE)

    # F2_s103 → F2_t104 (intersect, symmetric)
    with BuildSketch(Plane.XY.offset(6.1)):
        with Locations((-25, 0)):
            Circle(F2_S103_R)
    extrude(amount=F2_T104_DEPTH, both=True, mode=Mode.INTERSECT)


with BuildPart() as f2_tool105:
    # F2_s106 → F2_t107 (revolve)
    with BuildSketch(Plane(origin=(-4.1366258853, 9.2899931871, 0), x_dir=(0, 0, 1), z_dir=(0.4067739365, -0.9135288526, 0))):
        with BuildLine():
            ThreePointArc((7, 8.8382213158), (6.7071067812, 8.1311145346), (6, 7.8382213158))
            Line((6, 7.8382213158), (7, 7.8382213158))
            Line((7, 7.8382213158), (7, 8.8382213158))
        make_face()
    revolve(axis=Axis((-25, 0, 7), (0, 0, 1)), revolution_arc=F2_T107_ANGLE)

    # F2_s108 → F2_t109 (intersect, symmetric)
    with BuildSketch(Plane.XY.offset(6.1)):
        Circle(F2_S108_R)
    extrude(amount=F2_T109_DEPTH, both=True, mode=Mode.INTERSECT)


with BuildPart() as f2_tool100_1:
    add(f2_tool100.part)

    # F2_t110: intersect F2_tool105
    add(f2_tool105.part, mode=Mode.INTERSECT)


with BuildPart() as f1_10:
    add(f1_9.part)

    # F2_t98: cut F2_tool100
    add(f2_tool100_1.part, mode=Mode.SUBTRACT)


solid = f1_10.part
